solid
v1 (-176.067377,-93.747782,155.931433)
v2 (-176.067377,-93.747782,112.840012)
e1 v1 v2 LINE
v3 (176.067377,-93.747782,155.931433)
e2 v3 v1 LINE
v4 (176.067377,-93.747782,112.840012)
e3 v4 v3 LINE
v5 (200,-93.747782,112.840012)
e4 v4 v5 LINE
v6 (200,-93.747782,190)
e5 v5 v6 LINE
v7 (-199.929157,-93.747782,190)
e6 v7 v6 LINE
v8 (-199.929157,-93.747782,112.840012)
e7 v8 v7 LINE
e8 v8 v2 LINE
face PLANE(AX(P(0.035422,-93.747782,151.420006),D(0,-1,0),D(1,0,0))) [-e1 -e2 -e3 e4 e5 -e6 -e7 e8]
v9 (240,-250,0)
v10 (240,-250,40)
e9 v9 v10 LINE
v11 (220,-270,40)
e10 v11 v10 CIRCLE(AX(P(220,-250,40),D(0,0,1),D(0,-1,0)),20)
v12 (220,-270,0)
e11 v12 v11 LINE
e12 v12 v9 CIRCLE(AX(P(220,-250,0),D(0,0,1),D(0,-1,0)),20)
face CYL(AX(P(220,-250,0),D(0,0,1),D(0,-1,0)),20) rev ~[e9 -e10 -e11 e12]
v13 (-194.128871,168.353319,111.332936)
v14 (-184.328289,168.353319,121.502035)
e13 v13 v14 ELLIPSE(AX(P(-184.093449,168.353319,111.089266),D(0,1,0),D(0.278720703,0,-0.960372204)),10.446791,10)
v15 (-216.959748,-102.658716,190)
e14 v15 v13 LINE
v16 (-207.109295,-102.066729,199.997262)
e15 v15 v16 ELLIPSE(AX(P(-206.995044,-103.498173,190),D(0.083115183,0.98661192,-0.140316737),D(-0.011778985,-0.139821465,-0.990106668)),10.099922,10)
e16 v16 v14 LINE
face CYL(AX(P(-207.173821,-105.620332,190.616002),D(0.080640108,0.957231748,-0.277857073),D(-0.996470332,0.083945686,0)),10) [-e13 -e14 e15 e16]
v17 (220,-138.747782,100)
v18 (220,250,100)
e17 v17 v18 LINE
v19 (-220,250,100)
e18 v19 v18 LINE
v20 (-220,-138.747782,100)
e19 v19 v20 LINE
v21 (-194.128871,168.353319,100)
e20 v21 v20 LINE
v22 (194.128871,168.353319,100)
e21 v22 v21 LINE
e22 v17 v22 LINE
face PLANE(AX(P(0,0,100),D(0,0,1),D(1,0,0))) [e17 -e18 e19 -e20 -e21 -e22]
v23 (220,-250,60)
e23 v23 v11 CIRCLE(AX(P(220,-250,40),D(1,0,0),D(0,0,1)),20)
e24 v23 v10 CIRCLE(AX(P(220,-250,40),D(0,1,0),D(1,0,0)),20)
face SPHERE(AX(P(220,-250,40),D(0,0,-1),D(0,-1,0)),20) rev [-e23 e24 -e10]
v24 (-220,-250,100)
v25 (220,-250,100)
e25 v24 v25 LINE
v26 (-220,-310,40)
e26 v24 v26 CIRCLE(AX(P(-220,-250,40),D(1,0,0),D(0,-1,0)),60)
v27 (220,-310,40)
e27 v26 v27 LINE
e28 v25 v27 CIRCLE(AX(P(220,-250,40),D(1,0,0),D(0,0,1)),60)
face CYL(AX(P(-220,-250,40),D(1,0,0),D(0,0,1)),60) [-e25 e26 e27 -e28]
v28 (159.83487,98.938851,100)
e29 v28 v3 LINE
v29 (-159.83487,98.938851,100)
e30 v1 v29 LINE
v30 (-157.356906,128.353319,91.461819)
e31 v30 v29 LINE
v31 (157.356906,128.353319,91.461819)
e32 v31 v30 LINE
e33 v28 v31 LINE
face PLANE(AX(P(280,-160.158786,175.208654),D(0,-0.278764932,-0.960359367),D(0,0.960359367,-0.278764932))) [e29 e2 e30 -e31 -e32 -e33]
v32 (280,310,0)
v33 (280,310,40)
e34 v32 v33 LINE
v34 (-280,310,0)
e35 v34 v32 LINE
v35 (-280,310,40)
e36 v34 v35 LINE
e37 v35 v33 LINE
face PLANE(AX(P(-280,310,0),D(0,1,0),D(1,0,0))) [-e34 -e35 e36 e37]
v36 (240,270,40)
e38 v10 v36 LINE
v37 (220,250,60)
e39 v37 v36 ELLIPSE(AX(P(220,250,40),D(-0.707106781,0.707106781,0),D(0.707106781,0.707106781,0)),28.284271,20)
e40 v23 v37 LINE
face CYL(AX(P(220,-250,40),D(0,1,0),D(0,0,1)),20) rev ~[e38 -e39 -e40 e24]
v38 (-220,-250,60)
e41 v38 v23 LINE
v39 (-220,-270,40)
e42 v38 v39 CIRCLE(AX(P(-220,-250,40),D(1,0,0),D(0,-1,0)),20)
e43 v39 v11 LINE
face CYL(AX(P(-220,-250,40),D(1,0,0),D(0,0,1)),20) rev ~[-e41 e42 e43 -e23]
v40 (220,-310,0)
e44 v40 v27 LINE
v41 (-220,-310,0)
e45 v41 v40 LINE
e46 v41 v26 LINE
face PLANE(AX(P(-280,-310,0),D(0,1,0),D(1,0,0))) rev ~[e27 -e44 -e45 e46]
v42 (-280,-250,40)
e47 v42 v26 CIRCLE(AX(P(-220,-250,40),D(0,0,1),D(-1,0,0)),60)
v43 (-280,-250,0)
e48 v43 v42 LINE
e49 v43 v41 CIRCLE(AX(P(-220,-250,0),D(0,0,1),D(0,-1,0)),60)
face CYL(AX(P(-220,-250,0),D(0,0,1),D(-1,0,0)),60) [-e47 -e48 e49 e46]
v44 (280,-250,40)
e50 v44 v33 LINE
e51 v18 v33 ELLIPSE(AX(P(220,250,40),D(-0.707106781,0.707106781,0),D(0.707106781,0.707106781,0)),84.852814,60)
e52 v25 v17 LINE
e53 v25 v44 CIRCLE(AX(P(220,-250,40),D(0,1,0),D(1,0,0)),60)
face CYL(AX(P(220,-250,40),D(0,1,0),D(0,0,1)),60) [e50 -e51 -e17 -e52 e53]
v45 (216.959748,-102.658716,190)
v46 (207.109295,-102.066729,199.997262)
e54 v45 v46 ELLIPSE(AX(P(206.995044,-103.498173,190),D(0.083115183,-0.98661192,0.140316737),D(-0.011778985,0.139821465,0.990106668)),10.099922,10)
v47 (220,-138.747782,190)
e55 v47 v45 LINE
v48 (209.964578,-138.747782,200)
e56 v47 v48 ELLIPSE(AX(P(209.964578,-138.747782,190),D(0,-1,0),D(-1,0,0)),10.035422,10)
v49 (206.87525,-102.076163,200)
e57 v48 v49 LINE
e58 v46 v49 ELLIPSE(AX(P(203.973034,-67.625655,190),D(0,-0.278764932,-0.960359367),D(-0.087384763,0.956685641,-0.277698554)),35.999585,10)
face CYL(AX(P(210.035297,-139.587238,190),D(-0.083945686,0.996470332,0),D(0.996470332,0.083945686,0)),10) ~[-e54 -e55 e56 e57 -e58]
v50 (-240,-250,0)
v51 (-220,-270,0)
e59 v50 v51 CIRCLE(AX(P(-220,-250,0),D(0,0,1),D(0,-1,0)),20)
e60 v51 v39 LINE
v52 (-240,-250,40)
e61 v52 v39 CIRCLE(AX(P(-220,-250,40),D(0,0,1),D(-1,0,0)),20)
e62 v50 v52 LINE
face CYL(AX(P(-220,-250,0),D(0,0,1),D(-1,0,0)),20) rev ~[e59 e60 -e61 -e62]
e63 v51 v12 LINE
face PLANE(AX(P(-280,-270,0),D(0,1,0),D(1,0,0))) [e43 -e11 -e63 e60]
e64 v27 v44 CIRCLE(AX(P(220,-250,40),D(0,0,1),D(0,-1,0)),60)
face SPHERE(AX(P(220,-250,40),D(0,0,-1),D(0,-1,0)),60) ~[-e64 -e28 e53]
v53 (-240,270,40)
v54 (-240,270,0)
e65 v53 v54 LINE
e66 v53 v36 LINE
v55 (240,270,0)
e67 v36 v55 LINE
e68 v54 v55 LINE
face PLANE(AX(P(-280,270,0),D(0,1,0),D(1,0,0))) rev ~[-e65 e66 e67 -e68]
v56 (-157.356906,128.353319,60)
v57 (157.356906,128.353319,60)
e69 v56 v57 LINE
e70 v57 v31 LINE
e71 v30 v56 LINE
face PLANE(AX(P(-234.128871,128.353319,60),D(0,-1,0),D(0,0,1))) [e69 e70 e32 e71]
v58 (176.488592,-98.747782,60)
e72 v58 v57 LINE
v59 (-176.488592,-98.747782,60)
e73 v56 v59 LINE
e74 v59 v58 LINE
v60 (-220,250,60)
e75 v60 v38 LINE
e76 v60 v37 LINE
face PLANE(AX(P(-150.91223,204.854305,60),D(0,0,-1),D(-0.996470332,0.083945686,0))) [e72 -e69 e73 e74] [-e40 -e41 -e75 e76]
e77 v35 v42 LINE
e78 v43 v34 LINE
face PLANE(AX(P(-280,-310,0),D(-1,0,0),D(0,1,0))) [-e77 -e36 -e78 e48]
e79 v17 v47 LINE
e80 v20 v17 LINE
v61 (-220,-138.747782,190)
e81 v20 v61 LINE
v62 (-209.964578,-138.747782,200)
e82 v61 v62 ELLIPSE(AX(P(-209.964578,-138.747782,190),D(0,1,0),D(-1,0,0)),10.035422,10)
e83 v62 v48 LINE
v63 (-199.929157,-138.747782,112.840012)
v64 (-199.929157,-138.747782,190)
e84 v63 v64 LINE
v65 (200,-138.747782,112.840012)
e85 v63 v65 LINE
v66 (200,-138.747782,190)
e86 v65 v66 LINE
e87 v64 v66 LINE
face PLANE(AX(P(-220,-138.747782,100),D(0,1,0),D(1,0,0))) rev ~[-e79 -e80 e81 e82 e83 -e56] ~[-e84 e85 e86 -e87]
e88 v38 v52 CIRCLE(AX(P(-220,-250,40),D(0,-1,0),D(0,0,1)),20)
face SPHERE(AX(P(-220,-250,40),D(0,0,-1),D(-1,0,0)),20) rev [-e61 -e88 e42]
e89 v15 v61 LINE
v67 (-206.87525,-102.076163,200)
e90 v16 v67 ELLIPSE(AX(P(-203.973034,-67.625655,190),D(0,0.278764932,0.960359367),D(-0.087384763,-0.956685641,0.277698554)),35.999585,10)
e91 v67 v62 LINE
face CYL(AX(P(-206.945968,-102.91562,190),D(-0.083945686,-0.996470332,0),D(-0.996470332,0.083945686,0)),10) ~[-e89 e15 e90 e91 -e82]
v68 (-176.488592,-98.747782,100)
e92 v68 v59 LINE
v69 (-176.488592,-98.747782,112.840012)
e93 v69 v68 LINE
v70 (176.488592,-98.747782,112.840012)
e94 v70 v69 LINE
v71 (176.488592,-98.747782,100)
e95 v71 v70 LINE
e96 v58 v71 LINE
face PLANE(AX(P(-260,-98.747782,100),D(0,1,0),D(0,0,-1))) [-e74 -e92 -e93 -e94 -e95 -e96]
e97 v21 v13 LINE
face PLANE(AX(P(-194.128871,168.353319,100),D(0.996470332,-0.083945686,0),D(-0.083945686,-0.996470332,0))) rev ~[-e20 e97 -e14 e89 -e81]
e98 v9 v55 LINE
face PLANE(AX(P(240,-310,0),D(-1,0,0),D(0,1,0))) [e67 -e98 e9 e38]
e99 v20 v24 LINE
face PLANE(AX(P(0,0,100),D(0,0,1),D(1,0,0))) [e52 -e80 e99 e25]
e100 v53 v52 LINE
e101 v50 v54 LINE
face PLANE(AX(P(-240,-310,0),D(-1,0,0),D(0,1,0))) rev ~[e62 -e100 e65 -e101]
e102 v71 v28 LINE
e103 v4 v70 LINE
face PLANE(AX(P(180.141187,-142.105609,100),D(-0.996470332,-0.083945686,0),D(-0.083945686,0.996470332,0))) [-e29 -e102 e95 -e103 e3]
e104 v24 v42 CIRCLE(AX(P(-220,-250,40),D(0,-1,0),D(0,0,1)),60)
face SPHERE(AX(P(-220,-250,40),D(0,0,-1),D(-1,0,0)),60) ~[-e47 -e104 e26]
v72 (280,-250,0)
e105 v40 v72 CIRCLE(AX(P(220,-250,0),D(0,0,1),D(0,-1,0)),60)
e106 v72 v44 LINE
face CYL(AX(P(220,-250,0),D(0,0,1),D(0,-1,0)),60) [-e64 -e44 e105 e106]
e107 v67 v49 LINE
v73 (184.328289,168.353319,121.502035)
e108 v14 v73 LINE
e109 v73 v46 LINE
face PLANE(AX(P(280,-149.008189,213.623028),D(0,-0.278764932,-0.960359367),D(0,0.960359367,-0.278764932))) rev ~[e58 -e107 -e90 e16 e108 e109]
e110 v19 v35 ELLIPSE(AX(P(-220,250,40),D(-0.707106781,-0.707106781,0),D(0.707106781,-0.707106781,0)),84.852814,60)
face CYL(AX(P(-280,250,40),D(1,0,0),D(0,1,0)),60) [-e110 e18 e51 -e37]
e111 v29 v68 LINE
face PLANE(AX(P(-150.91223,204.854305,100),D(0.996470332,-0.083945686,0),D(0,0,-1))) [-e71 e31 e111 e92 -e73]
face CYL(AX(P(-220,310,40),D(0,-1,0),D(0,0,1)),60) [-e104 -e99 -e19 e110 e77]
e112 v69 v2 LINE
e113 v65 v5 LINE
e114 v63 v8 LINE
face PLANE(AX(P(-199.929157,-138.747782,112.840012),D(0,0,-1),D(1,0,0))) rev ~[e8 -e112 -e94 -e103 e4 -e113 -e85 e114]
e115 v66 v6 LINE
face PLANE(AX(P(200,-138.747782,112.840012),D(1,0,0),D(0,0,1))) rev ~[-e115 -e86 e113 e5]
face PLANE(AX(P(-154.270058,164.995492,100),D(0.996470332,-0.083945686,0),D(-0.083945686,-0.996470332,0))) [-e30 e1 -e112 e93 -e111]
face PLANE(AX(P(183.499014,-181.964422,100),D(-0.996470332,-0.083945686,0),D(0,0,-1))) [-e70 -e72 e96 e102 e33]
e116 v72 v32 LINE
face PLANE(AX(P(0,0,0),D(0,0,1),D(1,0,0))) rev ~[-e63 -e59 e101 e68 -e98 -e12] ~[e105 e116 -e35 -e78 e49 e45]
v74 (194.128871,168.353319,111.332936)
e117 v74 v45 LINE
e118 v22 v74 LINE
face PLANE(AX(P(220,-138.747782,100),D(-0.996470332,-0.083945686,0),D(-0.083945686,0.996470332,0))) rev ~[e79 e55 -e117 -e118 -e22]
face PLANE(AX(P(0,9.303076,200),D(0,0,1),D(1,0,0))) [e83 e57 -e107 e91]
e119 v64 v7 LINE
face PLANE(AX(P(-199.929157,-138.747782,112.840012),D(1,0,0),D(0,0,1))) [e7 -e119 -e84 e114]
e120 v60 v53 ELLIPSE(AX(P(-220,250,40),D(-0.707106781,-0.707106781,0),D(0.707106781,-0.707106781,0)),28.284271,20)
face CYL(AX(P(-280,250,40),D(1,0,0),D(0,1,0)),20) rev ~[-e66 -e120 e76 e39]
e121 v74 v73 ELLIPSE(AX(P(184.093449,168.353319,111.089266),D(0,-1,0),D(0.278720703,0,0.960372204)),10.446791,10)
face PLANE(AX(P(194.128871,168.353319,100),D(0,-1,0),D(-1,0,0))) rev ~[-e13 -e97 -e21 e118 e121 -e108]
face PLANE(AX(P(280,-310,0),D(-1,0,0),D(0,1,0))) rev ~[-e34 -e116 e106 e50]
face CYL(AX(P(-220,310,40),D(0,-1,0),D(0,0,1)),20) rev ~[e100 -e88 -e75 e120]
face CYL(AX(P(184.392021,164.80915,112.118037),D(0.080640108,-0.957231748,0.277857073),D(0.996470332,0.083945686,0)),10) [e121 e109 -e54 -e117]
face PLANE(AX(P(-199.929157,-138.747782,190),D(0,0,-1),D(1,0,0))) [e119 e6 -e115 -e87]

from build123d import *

# Parameters (mm, degrees)
F0_W         = 560
F0_H         = 620
F1_DEPTH     = 100
F2_R         = 60
F3_R         = 60
F5_DEPTH     = 100
F7_DEPTH     = 560.001
F8_R         = 10
F10_T        = 40
F10_T3_DEPTH = 520
F10_T5_DEPTH = 388.1889053137
F10_T7_DEPTH = 388.1889053137
F10_T9_DEPTH = 468.2577419281
F9_W         = 399.9291565789
F9_H         = 77.1599882841
F11_DEPTH    = 45


# Not quite as in the source:
# - a shell that OpenCascade refuses in one call is made with other operations: the cavity is built on its own and cut out


with BuildPart() as f1:
    # F0 (on Top) → F1 (new body)
    with BuildSketch(Plane.XY):
        Rectangle(F0_W, F0_H)
    extrude(amount=F1_DEPTH)

    # F2
    f2_edges = [f1.edges().sort_by_distance(p)[0] for p in [
        (280, -310, 50),
        (-280, -310, 50),
    ]]
    fillet(f2_edges, radius=F2_R)

    # F3
    f3_edges = [f1.edges().sort_by_distance(p)[0] for p in [
        (0, -310, 100),
        (-262.426407, -292.426407, 100),
        (262.426407, -292.426407, 100),
        (-280, 30, 100),
        (280, 30, 100),
        (0, 310, 100),
    ]]
    fillet(f3_edges, radius=F3_R)

    # F4 (on face) → F5 (join)
    with BuildSketch(Plane.XY.offset(100)):
        Polygon((-194.1288709641, 168.3533191681), (-220, -138.7477815151), (0, -138.7477815151), (220, -138.7477815151), (194.1288709641, 168.3533191681), (0, 168.3533191681), align=None)
    extrude(amount=F5_DEPTH)

    # F6 (on face) → F7 (cut, through all)
    with BuildSketch(Plane.YZ.offset(280)):
        Polygon((261.031751243, 237.4019711016), (-149.0081892093, 213.623028462), (222.8016257286, 105.6972444057), align=None)
    extrude(amount=-F7_DEPTH, mode=Mode.SUBTRACT)

    # F8
    f8_edges = [f1.edges().sort_by_distance(p)[0] for p in [
        (218.455336, -120.411972, 200),
        (205.519771, 33.138578, 160.751017),
        (-218.455336, -120.411972, 200),
        (-205.519771, 33.138578, 160.751017),
    ]]
    fillet(f8_edges, radius=F8_R)

    # F10: shell of thickness 40, made by hand


with BuildPart() as f10_core1:
    # F10_t2: copy of F1
    add(f1.part)

    # the walls: a layer under each face that stays
    f10_faces = [f10_core1.faces().sort_by_distance(p)[0] for p in [
        (0, -138.7477815151, 150),
        (-207.064435482, 14.8027688265, 145),
        (0, -194.3738907576, 100),
        (0, -120.411972418, 200),
        (207.064435482, 14.8027688265, 145),
        (-146.6666666667, 185.2087030808, 100),
        (0, 168.3533191681, 110.7510173791),
        (0, 33.1385779236, 160.7510173791),
        (262.4264068712, 30, 82.4264068712),
        (0, -292.4264068712, 82.4264068712),
        (-262.4264068712, 30, 82.4264068712),
        (0, 292.4264068712, 82.4264068712),
        (250, -280, 82.4264068712),
        (280, 30, 20),
        (-250, -280, 82.4264068712),
        (0, -310, 20),
        (-280, 30, 20),
        (0, 310, 20),
        (262.4264068712, -292.4264068712, 20),
        (-262.4264068712, -292.4264068712, 20),
    ]]
    thicken(f10_faces, amount=-F10_T, mode=Mode.SUBTRACT)

    # F10_s4 → F10_t3 (cut)
    with BuildSketch(Plane.YZ.offset(-260)):
        Polygon((-139.1477815151, 100.4), (-98.7477815151, 100), (-98.7477815151, 60), (-138.7477815151, 60), align=None)
    extrude(amount=F10_T3_DEPTH, mode=Mode.SUBTRACT)

    # F10_s6 → F10_t5 (cut)
    with BuildSketch(Plane(origin=(16.0724766165, 190.7870063494, 0), x_dir=(0, 0, 1), z_dir=(-0.0839456859, -0.9964703316, 0))):
        Polygon((100.4, 207.976195276), (100, 167.576195276), (60, 167.576195276), (60, 207.576195276), align=None)
    extrude(amount=F10_T5_DEPTH, mode=Mode.SUBTRACT)

    # F10_s8 → F10_t7 (cut)
    with BuildSketch(Plane(origin=(16.5143072895, -196.0317208644, 0), x_dir=(0, 0, 1), z_dir=(-0.0839456859, 0.9964703316, 0))):
        Polygon((100.4, 207.976195276), (100, 167.576195276), (60, 167.576195276), (60, 207.576195276), align=None)
    extrude(amount=F10_T7_DEPTH, mode=Mode.SUBTRACT)

    # F10_s10 → F10_t9 (cut)
    with BuildSketch(Plane.YZ.offset(-234.1288709641)):
        Polygon((168.7533191681, 100.4), (168.3533191681, 60), (128.3533191681, 60), (128.3533191681, 100), align=None)
    extrude(amount=F10_T9_DEPTH, mode=Mode.SUBTRACT)


with BuildPart() as f1_1:
    add(f1.part)

    # what is left inside the walls is the cavity
    f10_cavity = [f10_core1.part.solids().sort_by_distance(p)[0] for p in [
        (0, -90, 0.4),
    ]]
    add(f10_cavity, mode=Mode.SUBTRACT)

    # F9 (on face) → F11 (cut)
    with BuildSketch(Plane.XZ.offset(138.7477815151)):
        with Locations((0.0354217106, 151.4200058579)):
            Rectangle(F9_W, F9_H)
    extrude(amount=-F11_DEPTH, mode=Mode.SUBTRACT)


solid = f1_1.part
